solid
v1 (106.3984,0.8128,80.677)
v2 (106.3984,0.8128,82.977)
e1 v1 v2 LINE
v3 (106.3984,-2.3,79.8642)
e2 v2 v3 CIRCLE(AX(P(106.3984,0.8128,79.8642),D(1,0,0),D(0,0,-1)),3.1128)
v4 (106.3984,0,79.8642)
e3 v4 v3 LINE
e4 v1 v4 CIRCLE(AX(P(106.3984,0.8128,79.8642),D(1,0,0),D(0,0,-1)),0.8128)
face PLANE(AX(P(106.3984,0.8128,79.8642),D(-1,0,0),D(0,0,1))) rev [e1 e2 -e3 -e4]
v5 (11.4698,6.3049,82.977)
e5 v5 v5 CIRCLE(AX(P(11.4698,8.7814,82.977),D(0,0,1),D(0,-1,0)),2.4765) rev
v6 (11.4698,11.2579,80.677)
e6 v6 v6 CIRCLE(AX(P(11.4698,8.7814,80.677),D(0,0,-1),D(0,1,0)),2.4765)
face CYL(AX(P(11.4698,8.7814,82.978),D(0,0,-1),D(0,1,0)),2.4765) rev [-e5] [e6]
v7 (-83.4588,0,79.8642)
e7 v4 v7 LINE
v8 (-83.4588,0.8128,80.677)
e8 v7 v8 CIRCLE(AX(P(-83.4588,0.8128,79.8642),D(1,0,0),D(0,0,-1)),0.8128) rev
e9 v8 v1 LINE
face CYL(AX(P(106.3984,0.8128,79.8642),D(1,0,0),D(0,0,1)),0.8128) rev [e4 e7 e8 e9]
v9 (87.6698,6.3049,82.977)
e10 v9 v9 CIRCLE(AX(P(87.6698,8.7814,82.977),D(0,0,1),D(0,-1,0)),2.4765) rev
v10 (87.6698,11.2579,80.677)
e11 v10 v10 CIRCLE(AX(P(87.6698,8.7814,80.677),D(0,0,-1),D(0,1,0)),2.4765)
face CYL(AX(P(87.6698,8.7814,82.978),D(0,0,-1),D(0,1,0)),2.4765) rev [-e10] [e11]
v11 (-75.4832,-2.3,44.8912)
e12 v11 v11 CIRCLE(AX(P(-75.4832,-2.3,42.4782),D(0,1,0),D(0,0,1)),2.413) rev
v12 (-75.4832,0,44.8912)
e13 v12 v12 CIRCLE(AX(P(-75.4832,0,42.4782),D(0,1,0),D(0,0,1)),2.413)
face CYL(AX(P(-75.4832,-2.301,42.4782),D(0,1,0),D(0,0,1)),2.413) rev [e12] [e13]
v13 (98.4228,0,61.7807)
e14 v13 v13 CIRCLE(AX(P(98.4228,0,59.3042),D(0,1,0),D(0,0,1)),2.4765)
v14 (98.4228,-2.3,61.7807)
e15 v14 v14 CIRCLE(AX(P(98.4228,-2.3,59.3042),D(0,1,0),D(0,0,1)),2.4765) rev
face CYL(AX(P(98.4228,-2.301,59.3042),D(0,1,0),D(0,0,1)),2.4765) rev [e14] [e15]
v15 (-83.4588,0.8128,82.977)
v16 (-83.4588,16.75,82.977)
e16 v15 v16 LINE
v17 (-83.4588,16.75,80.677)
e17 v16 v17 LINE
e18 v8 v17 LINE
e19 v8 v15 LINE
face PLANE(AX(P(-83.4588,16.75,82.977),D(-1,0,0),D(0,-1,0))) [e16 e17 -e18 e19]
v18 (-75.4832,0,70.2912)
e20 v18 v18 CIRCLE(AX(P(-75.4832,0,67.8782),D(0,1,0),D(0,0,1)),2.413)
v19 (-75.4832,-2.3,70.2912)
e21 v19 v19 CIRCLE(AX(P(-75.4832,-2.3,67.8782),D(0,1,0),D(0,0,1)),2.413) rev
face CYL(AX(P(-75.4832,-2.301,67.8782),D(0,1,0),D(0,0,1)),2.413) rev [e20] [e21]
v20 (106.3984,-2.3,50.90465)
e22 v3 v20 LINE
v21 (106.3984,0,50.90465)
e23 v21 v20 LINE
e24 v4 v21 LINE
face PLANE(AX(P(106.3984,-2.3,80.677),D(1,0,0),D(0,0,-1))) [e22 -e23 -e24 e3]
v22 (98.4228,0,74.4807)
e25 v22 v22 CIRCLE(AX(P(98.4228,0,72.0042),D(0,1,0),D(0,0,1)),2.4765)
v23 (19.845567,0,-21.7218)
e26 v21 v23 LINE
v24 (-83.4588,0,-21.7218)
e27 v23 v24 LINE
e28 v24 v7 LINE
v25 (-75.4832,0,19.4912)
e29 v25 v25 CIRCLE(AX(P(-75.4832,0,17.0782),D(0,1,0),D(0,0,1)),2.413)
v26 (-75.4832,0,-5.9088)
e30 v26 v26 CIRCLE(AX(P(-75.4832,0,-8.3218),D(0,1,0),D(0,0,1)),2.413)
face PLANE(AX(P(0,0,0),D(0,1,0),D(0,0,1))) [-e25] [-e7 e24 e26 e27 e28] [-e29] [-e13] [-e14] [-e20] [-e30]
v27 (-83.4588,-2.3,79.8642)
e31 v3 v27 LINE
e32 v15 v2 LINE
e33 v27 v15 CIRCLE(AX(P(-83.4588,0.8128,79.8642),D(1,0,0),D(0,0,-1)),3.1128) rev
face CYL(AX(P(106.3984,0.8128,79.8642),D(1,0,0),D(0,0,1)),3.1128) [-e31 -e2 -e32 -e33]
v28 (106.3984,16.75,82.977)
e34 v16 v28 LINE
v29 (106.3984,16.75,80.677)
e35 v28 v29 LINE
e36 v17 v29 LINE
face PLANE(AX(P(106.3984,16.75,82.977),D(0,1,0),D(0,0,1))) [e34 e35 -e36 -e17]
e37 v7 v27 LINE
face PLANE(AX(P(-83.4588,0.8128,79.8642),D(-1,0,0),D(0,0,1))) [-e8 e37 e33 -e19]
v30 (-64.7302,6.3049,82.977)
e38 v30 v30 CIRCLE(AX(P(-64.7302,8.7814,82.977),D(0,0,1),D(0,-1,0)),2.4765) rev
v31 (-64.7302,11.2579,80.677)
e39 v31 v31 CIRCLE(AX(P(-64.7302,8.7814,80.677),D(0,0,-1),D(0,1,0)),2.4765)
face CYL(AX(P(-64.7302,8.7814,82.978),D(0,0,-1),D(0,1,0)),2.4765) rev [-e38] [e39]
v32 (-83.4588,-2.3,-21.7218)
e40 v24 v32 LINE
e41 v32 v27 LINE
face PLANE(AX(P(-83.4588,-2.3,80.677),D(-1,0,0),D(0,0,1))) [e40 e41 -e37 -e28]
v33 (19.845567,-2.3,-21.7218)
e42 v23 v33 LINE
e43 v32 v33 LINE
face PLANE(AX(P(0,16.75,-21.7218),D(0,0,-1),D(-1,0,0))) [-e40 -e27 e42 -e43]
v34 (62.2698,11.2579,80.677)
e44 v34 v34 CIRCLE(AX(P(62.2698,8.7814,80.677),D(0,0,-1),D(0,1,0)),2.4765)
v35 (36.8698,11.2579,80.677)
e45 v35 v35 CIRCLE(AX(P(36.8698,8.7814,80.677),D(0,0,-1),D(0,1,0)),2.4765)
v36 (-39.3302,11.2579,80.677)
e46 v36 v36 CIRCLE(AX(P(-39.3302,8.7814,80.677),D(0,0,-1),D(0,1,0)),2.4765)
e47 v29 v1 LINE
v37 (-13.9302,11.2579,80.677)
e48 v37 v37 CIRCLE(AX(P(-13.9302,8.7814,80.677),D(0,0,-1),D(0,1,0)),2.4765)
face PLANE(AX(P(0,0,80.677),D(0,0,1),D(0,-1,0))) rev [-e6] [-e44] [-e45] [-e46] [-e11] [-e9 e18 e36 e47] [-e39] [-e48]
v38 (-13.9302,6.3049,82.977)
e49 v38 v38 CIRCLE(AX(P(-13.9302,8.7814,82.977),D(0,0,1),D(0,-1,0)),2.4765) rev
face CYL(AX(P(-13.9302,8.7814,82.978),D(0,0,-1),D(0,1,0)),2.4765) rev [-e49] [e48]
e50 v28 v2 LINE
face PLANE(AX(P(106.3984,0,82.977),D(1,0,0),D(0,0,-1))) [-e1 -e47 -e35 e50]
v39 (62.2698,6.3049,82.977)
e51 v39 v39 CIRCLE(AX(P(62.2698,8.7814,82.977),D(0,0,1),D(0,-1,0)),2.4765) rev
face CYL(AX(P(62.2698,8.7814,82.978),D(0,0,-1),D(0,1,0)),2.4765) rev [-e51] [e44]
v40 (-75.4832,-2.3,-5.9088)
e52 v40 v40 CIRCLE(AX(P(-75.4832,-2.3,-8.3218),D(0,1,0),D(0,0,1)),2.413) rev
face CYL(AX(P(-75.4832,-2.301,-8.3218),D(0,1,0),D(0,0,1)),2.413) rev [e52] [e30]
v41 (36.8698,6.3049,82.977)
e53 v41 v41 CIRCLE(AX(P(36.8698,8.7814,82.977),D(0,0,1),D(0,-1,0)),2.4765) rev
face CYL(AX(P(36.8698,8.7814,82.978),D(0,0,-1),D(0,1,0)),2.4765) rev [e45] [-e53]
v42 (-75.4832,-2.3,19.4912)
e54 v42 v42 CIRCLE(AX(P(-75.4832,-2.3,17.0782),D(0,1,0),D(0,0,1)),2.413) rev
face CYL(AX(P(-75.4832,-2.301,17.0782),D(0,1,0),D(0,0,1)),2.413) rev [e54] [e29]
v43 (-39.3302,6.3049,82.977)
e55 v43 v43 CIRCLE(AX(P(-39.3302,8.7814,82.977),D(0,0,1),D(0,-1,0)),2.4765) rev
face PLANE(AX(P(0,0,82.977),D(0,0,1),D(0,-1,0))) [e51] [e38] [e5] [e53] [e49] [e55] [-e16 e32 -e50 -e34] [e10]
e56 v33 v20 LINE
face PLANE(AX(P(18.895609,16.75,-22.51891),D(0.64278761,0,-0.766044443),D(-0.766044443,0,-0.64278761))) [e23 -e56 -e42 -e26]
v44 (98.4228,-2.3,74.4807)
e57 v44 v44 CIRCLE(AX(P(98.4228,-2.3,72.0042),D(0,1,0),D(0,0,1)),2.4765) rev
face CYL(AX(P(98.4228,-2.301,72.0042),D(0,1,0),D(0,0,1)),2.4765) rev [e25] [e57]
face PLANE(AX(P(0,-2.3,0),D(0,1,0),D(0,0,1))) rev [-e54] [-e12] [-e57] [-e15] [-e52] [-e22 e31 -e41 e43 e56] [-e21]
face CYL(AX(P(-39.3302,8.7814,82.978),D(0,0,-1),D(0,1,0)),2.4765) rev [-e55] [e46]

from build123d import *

# Parameters (mm, degrees)
SKETCH1_W                    = 189.8572
SKETCH1_H                    = 175.514
BASE_FLANGE1_DEPTH           = 2.3
EDGE_FLANGE4_STRIP_W         = 10.8256
EDGE_FLANGE4_STRIP_H         = 2.3
EDGE_FLANGE4_STRIP_CUT_DEPTH = 189.8572
EDGE_FLANGE4_DEPTH           = 189.8572
CUT_EXTRUDE1_DEPTH           = 144.797004807
CUT_EXTRUDE5_REACH           = 150.616
SKETCH41_R                   = 2.4765
CUT_EXTRUDE6_REACH           = 137.965
SKETCH42_R                   = 2.413
SKETCH42_R_2                 = 2.4765


# Sheet-metal steps are written as plain solids
with BuildPart() as part:
    # Sketch1 → Base-Flange1 (new body)
    with BuildSketch(Plane(origin=(0, 0, 0), x_dir=(1, 0, 0), z_dir=(0, 1, 0))):
        with Locations((11.4698, 7.08)):
            Rectangle(SKETCH1_W, SKETCH1_H)
    extrude(amount=-BASE_FLANGE1_DEPTH)

    # Edge-Flange4 strip (across the edge) → Edge-Flange4 strip cut (cut)
    with BuildSketch(Plane(origin=(-83.4588, 0, 80.677), x_dir=(0, 0, -1), z_dir=(1, 0, 0))):
        with Locations((-4.6, -1.15)):
            Rectangle(EDGE_FLANGE4_STRIP_W, EDGE_FLANGE4_STRIP_H)
    extrude(amount=EDGE_FLANGE4_STRIP_CUT_DEPTH, mode=Mode.SUBTRACT)

    # Edge-Flange4 section (across the edge) → Edge-Flange4 (add)
    with BuildSketch(Plane(origin=(-83.4588, 0, 80.677), x_dir=(0, 0, -1), z_dir=(1, 0, 0))):
        with BuildLine():
            Line((-2.3, 0.8128), (-2.3, 16.75))
            Line((-2.3, 16.75), (0, 16.75))
            Line((0, 16.75), (0, 0.8128))
            ThreePointArc((0, 0.8128), (0.238063608, 0.238063608), (0.8128, 0))
            Line((0.8128, 0), (0.8128, -2.3))
            ThreePointArc((0.8128, -2.3), (-1.388281988, -1.388281988), (-2.3, 0.8128))
        make_face()
    extrude(amount=EDGE_FLANGE4_DEPTH)

    # Sketch36 → Cut-Extrude1 (cut, through all)
    with BuildSketch(Plane.XZ.offset(2.3)):
        Polygon((19.845566889, -21.7218), (-83.4588, -21.7218), (-83.4588, -94.837), (106.3984, -94.837), (106.3984, 50.90465034), align=None)
    extrude(amount=-CUT_EXTRUDE1_DEPTH, mode=Mode.SUBTRACT)

    # Sketch41 → Cut-Extrude5 (cut, up to next)
    with BuildSketch(Plane(origin=(0, 0, 80.677), x_dir=(-1, 0, 0), z_dir=(0, 0, -1)), mode=Mode.PRIVATE) as cut_extrude5_sk1:
        with Locations(Location((64.7302, 8.7814, 0), (0, 0, 90))):
            Circle(SKETCH41_R)
    cut_extrude5_tool1 = extrude(cut_extrude5_sk1.sketch, amount=-CUT_EXTRUDE5_REACH, mode=Mode.PRIVATE) & part.part
    # Sketch41 → Cut-Extrude5 (cut, up to next)
    with BuildSketch(Plane(origin=(0, 0, 80.677), x_dir=(-1, 0, 0), z_dir=(0, 0, -1)), mode=Mode.PRIVATE) as cut_extrude5_sk2:
        with Locations(Location((39.3302, 8.7814, 0), (0, 0, 90))):
            Circle(SKETCH41_R)
    cut_extrude5_tool2 = extrude(cut_extrude5_sk2.sketch, amount=-CUT_EXTRUDE5_REACH, mode=Mode.PRIVATE) & part.part
    # Sketch41 → Cut-Extrude5 (cut, up to next)
    with BuildSketch(Plane(origin=(0, 0, 80.677), x_dir=(-1, 0, 0), z_dir=(0, 0, -1)), mode=Mode.PRIVATE) as cut_extrude5_sk3:
        with Locations(Location((13.9302, 8.7814, 0), (0, 0, 90))):
            Circle(SKETCH41_R)
    cut_extrude5_tool3 = extrude(cut_extrude5_sk3.sketch, amount=-CUT_EXTRUDE5_REACH, mode=Mode.PRIVATE) & part.part
    # Sketch41 → Cut-Extrude5 (cut, up to next)
    with BuildSketch(Plane(origin=(0, 0, 80.677), x_dir=(-1, 0, 0), z_dir=(0, 0, -1)), mode=Mode.PRIVATE) as cut_extrude5_sk4:
        with Locations(Location((-11.4698, 8.7814, 0), (0, 0, 90))):
            Circle(SKETCH41_R)
    cut_extrude5_tool4 = extrude(cut_extrude5_sk4.sketch, amount=-CUT_EXTRUDE5_REACH, mode=Mode.PRIVATE) & part.part
    # Sketch41 → Cut-Extrude5 (cut, up to next)
    with BuildSketch(Plane(origin=(0, 0, 80.677), x_dir=(-1, 0, 0), z_dir=(0, 0, -1)), mode=Mode.PRIVATE) as cut_extrude5_sk5:
        with Locations(Location((-36.8698, 8.7814, 0), (0, 0, 90))):
            Circle(SKETCH41_R)
    cut_extrude5_tool5 = extrude(cut_extrude5_sk5.sketch, amount=-CUT_EXTRUDE5_REACH, mode=Mode.PRIVATE) & part.part
    # Sketch41 → Cut-Extrude5 (cut, up to next)
    with BuildSketch(Plane(origin=(0, 0, 80.677), x_dir=(-1, 0, 0), z_dir=(0, 0, -1)), mode=Mode.PRIVATE) as cut_extrude5_sk6:
        with Locations(Location((-62.2698, 8.7814, 0), (0, 0, 90))):
            Circle(SKETCH41_R)
    cut_extrude5_tool6 = extrude(cut_extrude5_sk6.sketch, amount=-CUT_EXTRUDE5_REACH, mode=Mode.PRIVATE) & part.part
    # Sketch41 → Cut-Extrude5 (cut, up to next)
    with BuildSketch(Plane(origin=(0, 0, 80.677), x_dir=(-1, 0, 0), z_dir=(0, 0, -1)), mode=Mode.PRIVATE) as cut_extrude5_sk7:
        with Locations(Location((-87.6698, 8.7814, 0), (0, 0, 90))):
            Circle(SKETCH41_R)
    cut_extrude5_tool7 = extrude(cut_extrude5_sk7.sketch, amount=-CUT_EXTRUDE5_REACH, mode=Mode.PRIVATE) & part.part
    add(cut_extrude5_tool1.solids().sort_by_distance((-64.7302, 8.7814, 80.677))[0], mode=Mode.SUBTRACT)
    add(cut_extrude5_tool2.solids().sort_by_distance((-39.3302, 8.7814, 80.677))[0], mode=Mode.SUBTRACT)
    add(cut_extrude5_tool3.solids().sort_by_distance((-13.9302, 8.7814, 80.677))[0], mode=Mode.SUBTRACT)
    add(cut_extrude5_tool4.solids().sort_by_distance((11.4698, 8.7814, 80.677))[0], mode=Mode.SUBTRACT)
    add(cut_extrude5_tool5.solids().sort_by_distance((36.8698, 8.7814, 80.677))[0], mode=Mode.SUBTRACT)
    add(cut_extrude5_tool6.solids().sort_by_distance((62.2698, 8.7814, 80.677))[0], mode=Mode.SUBTRACT)
    add(cut_extrude5_tool7.solids().sort_by_distance((87.6698, 8.7814, 80.677))[0], mode=Mode.SUBTRACT)

    # Sketch42 → Cut-Extrude6 (cut, up to next)
    with BuildSketch(Plane(origin=(0, 0, 0), x_dir=(1, 0, 0), z_dir=(0, 1, 0)), mode=Mode.PRIVATE) as cut_extrude6_sk1:
        with Locations(Location((-75.4832, 8.3218, 0), (0, 0, 270))):
            Circle(SKETCH42_R)
    cut_extrude6_tool1 = extrude(cut_extrude6_sk1.sketch, amount=-CUT_EXTRUDE6_REACH, mode=Mode.PRIVATE) & part.part
    # Sketch42 → Cut-Extrude6 (cut, up to next)
    with BuildSketch(Plane(origin=(0, 0, 0), x_dir=(1, 0, 0), z_dir=(0, 1, 0)), mode=Mode.PRIVATE) as cut_extrude6_sk2:
        with Locations(Location((-75.4832, -17.0782, 0), (0, 0, 270))):
            Circle(SKETCH42_R)
    cut_extrude6_tool2 = extrude(cut_extrude6_sk2.sketch, amount=-CUT_EXTRUDE6_REACH, mode=Mode.PRIVATE) & part.part
    # Sketch42 → Cut-Extrude6 (cut, up to next)
    with BuildSketch(Plane(origin=(0, 0, 0), x_dir=(1, 0, 0), z_dir=(0, 1, 0)), mode=Mode.PRIVATE) as cut_extrude6_sk3:
        with Locations(Location((-75.4832, -42.4782, 0), (0, 0, 270))):
            Circle(SKETCH42_R)
    cut_extrude6_tool3 = extrude(cut_extrude6_sk3.sketch, amount=-CUT_EXTRUDE6_REACH, mode=Mode.PRIVATE) & part.part
    # Sketch42 → Cut-Extrude6 (cut, up to next)
    with BuildSketch(Plane(origin=(0, 0, 0), x_dir=(1, 0, 0), z_dir=(0, 1, 0)), mode=Mode.PRIVATE) as cut_extrude6_sk4:
        with Locations(Location((-75.4832, -67.8782, 0), (0, 0, 270))):
            Circle(SKETCH42_R)
    cut_extrude6_tool4 = extrude(cut_extrude6_sk4.sketch, amount=-CUT_EXTRUDE6_REACH, mode=Mode.PRIVATE) & part.part
    # Sketch42 → Cut-Extrude6 (cut, up to next)
    with BuildSketch(Plane(origin=(0, 0, 0), x_dir=(1, 0, 0), z_dir=(0, 1, 0)), mode=Mode.PRIVATE) as cut_extrude6_sk5:
        with Locations(Location((98.4228, -59.3042, 0), (0, 0, 270))):
            Circle(SKETCH42_R_2)
    cut_extrude6_tool5 = extrude(cut_extrude6_sk5.sketch, amount=-CUT_EXTRUDE6_REACH, mode=Mode.PRIVATE) & part.part
    # Sketch42 → Cut-Extrude6 (cut, up to next)
    with BuildSketch(Plane(origin=(0, 0, 0), x_dir=(1, 0, 0), z_dir=(0, 1, 0)), mode=Mode.PRIVATE) as cut_extrude6_sk6:
        with Locations(Location((98.4228, -72.0042, 0), (0, 0, 270))):
            Circle(SKETCH42_R_2)
    cut_extrude6_tool6 = extrude(cut_extrude6_sk6.sketch, amount=-CUT_EXTRUDE6_REACH, mode=Mode.PRIVATE) & part.part
    add(cut_extrude6_tool1.solids().sort_by_distance((-75.4832, 0, -8.3218))[0], mode=Mode.SUBTRACT)
    add(cut_extrude6_tool2.solids().sort_by_distance((-75.4832, 0, 17.0782))[0], mode=Mode.SUBTRACT)
    add(cut_extrude6_tool3.solids().sort_by_distance((-75.4832, 0, 42.4782))[0], mode=Mode.SUBTRACT)
    add(cut_extrude6_tool4.solids().sort_by_distance((-75.4832, 0, 67.8782))[0], mode=Mode.SUBTRACT)
    add(cut_extrude6_tool5.solids().sort_by_distance((98.4228, 0, 59.3042))[0], mode=Mode.SUBTRACT)
    add(cut_extrude6_tool6.solids().sort_by_distance((98.4228, 0, 72.0042))[0], mode=Mode.SUBTRACT)


solid = part.part
